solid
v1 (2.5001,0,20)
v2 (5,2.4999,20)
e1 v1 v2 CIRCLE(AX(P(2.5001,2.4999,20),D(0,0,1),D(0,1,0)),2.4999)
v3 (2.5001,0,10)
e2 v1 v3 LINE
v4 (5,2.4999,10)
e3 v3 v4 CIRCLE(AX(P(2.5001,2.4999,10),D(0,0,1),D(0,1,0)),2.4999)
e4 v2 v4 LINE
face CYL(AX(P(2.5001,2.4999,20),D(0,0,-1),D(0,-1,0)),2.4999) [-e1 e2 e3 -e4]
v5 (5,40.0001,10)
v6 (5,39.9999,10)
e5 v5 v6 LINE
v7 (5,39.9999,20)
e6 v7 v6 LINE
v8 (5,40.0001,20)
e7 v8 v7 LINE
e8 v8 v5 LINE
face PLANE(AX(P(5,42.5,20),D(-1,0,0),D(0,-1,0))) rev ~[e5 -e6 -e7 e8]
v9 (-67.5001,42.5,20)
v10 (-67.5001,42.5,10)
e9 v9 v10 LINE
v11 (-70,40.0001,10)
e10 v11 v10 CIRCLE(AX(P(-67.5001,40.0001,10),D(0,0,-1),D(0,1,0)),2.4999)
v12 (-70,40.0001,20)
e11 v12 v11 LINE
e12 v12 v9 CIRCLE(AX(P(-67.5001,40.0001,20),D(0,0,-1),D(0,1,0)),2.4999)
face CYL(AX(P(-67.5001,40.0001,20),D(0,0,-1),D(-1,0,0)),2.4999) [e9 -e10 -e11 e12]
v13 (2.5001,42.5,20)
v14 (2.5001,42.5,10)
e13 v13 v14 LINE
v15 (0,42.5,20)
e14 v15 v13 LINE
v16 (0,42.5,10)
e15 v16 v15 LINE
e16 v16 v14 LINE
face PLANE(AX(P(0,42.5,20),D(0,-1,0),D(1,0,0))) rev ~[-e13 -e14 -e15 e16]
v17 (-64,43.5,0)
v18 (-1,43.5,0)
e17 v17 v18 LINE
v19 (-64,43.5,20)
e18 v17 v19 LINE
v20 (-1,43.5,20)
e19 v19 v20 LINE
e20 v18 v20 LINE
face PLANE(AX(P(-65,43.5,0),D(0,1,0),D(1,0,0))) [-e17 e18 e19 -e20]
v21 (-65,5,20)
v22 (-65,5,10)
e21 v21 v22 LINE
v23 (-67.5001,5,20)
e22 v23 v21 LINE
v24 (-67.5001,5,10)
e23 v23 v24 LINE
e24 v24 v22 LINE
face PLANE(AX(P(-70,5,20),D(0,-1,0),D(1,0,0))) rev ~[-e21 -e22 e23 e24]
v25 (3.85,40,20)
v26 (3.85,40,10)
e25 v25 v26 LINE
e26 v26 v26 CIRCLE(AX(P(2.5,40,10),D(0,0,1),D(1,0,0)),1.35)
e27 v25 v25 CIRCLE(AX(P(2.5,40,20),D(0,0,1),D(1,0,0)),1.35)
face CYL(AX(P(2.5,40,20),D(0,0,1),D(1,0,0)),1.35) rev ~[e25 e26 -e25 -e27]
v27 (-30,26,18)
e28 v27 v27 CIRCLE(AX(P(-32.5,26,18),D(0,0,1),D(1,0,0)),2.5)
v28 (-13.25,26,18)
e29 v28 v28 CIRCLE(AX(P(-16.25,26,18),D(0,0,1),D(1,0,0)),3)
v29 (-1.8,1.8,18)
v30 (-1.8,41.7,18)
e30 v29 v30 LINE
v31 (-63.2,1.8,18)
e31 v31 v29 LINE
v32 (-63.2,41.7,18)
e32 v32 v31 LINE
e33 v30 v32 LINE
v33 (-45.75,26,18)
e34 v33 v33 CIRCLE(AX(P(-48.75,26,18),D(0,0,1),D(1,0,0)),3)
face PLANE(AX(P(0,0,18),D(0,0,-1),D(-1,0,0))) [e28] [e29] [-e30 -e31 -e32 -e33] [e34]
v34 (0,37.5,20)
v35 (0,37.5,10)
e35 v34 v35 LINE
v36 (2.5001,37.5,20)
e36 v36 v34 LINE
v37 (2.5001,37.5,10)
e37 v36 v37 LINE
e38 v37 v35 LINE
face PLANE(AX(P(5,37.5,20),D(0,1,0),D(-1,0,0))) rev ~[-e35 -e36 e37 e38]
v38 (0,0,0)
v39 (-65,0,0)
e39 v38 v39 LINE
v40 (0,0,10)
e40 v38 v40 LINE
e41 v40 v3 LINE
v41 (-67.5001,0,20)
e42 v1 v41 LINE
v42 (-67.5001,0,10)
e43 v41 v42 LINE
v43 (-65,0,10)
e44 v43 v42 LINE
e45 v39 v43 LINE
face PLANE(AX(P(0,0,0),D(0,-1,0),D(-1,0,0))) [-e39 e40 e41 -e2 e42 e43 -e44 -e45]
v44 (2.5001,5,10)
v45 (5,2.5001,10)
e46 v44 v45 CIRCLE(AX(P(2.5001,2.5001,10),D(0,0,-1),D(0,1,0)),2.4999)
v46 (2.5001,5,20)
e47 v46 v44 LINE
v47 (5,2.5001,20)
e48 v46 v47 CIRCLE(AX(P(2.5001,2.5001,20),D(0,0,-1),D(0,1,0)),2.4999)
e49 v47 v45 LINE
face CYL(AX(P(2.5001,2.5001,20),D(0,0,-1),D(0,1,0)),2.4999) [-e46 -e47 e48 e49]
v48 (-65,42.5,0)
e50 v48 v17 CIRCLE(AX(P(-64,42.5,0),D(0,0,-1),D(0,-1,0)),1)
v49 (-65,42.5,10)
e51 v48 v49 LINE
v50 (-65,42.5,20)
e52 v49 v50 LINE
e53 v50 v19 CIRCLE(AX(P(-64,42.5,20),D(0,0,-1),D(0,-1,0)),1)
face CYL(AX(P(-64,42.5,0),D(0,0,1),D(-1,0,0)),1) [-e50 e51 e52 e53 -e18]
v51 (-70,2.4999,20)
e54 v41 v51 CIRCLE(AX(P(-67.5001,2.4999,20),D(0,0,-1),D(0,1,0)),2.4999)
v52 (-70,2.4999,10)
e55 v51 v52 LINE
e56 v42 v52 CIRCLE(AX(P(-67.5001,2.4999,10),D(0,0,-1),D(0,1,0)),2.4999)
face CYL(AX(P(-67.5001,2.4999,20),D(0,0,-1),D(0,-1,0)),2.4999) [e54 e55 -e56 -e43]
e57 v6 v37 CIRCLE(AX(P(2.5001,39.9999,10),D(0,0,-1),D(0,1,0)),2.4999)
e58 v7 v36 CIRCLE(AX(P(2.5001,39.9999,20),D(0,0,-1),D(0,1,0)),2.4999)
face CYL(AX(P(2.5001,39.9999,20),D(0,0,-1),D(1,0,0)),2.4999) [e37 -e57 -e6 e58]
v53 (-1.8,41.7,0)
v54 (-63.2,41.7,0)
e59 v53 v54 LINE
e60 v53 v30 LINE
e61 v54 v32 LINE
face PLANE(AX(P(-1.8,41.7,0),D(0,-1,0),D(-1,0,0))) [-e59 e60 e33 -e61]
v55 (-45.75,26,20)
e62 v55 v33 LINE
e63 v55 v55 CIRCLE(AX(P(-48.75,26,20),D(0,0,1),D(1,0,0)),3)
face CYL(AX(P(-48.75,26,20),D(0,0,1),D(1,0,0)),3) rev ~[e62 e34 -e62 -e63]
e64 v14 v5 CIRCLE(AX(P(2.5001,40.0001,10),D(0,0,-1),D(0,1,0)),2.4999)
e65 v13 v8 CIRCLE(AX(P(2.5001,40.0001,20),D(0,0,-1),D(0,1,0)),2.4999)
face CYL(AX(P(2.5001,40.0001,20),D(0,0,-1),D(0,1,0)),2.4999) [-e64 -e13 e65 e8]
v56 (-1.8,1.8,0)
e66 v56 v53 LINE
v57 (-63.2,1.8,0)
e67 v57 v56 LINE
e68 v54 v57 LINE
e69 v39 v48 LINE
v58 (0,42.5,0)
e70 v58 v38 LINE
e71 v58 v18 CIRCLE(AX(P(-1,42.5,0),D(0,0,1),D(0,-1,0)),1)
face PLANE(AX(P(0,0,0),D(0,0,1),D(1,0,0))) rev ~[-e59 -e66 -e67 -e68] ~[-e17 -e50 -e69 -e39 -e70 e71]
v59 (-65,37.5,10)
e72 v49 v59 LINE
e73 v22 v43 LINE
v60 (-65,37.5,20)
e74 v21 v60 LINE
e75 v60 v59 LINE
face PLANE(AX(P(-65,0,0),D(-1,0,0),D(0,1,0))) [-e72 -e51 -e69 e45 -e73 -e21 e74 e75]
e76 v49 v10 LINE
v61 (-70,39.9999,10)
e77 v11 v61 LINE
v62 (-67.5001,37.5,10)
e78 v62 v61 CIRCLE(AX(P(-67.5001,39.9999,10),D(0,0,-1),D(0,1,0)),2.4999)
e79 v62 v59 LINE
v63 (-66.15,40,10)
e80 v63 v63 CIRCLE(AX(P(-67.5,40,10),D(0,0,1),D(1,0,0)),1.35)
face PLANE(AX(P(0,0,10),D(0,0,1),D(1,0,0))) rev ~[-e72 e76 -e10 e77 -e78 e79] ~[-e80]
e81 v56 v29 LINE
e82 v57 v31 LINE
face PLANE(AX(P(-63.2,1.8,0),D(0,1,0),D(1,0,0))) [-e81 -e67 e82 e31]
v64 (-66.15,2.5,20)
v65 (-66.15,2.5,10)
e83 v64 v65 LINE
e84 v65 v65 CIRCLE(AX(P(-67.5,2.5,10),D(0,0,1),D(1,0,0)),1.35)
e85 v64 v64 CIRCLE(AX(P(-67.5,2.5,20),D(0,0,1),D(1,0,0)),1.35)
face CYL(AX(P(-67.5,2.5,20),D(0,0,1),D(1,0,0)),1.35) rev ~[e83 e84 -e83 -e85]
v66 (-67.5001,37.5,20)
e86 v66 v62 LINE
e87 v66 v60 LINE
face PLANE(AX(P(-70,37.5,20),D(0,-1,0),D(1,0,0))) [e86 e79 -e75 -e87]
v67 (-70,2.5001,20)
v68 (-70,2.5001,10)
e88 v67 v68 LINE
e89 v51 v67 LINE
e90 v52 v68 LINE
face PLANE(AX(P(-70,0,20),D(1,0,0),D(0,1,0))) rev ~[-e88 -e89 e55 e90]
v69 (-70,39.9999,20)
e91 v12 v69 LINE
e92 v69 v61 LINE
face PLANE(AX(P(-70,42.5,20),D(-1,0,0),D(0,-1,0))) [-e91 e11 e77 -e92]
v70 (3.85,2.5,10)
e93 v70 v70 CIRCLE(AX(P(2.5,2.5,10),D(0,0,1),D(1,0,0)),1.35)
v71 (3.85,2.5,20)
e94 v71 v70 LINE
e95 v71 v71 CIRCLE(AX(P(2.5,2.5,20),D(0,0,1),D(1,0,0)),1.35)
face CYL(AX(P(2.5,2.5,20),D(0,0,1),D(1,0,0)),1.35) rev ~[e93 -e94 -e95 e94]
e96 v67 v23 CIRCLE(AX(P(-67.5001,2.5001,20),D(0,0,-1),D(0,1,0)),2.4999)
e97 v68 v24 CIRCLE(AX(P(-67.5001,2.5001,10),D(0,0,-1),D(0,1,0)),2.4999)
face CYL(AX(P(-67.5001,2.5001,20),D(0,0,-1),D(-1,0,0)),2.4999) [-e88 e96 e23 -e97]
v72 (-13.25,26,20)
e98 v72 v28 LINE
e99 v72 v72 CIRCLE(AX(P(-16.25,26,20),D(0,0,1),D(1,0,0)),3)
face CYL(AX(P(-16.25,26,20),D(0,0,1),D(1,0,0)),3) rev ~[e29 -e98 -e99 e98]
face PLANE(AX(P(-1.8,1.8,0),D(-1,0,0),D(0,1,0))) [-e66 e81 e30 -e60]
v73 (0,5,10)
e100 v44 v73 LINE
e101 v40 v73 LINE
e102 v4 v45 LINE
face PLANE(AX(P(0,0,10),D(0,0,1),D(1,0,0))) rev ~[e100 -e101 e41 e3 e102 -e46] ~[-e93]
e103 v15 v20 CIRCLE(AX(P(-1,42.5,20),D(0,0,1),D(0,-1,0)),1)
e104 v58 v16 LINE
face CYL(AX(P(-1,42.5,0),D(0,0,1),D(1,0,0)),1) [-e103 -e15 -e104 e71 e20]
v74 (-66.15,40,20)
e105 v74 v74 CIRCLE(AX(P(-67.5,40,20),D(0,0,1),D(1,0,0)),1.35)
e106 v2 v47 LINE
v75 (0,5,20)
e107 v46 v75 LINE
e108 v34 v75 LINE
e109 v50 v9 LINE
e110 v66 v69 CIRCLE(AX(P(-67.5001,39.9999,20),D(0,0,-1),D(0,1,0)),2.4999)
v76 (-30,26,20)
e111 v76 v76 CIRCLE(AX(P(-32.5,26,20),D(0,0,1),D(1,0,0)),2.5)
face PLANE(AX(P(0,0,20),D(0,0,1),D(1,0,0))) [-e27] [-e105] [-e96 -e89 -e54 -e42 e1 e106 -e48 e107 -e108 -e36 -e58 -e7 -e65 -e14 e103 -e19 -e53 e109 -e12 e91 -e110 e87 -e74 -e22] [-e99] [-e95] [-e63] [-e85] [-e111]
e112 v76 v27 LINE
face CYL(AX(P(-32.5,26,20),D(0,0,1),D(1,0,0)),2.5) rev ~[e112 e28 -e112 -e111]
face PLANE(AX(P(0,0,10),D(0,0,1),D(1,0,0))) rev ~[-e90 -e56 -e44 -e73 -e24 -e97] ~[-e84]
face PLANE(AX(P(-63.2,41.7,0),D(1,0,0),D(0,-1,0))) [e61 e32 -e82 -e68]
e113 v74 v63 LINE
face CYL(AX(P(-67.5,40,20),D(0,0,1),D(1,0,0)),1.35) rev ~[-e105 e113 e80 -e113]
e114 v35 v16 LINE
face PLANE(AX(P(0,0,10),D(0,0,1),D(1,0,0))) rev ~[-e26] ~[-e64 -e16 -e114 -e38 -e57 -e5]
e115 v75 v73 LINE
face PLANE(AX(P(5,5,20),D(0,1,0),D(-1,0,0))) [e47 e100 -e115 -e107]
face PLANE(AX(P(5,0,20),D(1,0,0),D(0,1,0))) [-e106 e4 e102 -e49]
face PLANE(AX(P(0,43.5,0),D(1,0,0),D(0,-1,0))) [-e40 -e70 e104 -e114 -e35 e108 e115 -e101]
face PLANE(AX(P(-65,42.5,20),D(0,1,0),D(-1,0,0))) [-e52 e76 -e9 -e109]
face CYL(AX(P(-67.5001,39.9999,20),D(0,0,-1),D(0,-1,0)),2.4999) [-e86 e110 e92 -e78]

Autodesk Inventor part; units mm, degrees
ref_plane "YZ Plane" through (0, 0, 0) normal (1, 0, 0) x (0, 1, 0)
ref_plane "XZ Plane" through (0, 0, 0) normal (0, 1, 0) x (-1, 0, 0)
ref_plane "XY Plane" through (0, 0, 0) normal (0, 0, 1) x (1, 0, 0)
sketch "Sketch1" plane through (0, 0, 0) normal (0, 0, 1) x (1, 0, 0)
  line L0 (0, 0) -> (-65, 0)
  line L1 (-65, 0) -> (-65, 43.5)
  line L2 (-65, 43.5) -> (0, 43.5)
  line L3 (0, 43.5) -> (0, 0)
  dimension "d0" = 43.5
  dimension "d1" = 65
extrude "Extrusion1" add sketch "Sketch1" along normal blind 20
sketch "Sketch2" plane through (0, 0, 0) normal (0, 0, -1) x (-1, 0, 0)
  line L0 (1.8, 41.7) -> (63.2, 41.7)
  line L1 (63.2, 41.7) -> (63.2, 1.8)
  line L2 (63.2, 1.8) -> (1.8, 1.8)
  line L3 (1.8, 1.8) -> (1.8, 41.7)
  line L4 (65, 43.5) -> (65, 0) projected
  line L5 (0, 43.5) -> (65, 43.5) projected
  line L6 (0, 0) -> (0, 43.5) projected
  line L7 (65, 0) -> (0, 0) projected
  point P0 (65, 21.75)
  dimension "d4" = 1.8
  dimension "d5" = 1.8
  dimension "d6" = 1.8
  dimension "d7" = 1.8
extrude "Extrusion2" cut sketch "Sketch2" against normal blind 18 contours L0 L1 L2 L3
sketch "Sketch3" plane through (0, 0, 20) normal (0, 0, 1) x (1, 0, 0)
  circle A0 centre (-48.75, 26) radius 3
  circle A1 centre (-32.5, 26) radius 2.5
  circle A2 centre (-16.25, 26) radius 3
  line L0 (-65, 43.5) -> (-65, 0) projected
  line L1 (0, 43.5) -> (-65, 43.5) projected
  point P0 (0, 0)
  dimension "d10" = 16.25
  dimension "d11" = 16.25
  dimension "d12" = 16.25
  dimension "d13" = 6
  dimension "d14" = 17.5
  dimension "d15" = 5
extrude "Extrusion3" cut sketch "Sketch3" against normal up to surface (2 mm away)
fillet "Fillet1" radius 1 2 edges at (-65, 43.5, 10) (0, 43.5, 10)
sketch "Sketch4" plane through (0, 0, 20) normal (0, 0, 1) x (1, 0, 0)
  line L0 (0, 0) -> (0, 42.5) projected
  line L1 (0, 42.5) -> (5, 42.5)
  line L2 (5, 42.5) -> (5, 37.5)
  line L3 (5, 37.5) -> (0, 37.5)
  line L4 (0, 37.5) -> (0, 42.5)
  line L5 (-65, 42.5) -> (-65, 0) projected
  line L6 (-65, 42.5) -> (-70, 42.5)
  line L7 (-70, 42.5) -> (-70, 37.5)
  line L8 (-70, 37.5) -> (-65, 37.5)
  line L9 (-65, 37.5) -> (-65, 42.5)
  circle A0 centre (-67.5, 40) radius 1.35
  circle A1 centre (2.5, 40) radius 1.35
  line L10 (0, 0) -> (5, 0)
  line L11 (5, 0) -> (5, 5)
  line L12 (5, 5) -> (0, 5)
  line L13 (0, 5) -> (0, 0)
  line L14 (-65, 0) -> (0, 0) projected
  line L15 (-65, 0) -> (-70, 0)
  line L16 (-70, 0) -> (-70, 5)
  line L17 (-70, 5) -> (-65, 5)
  line L18 (-65, 5) -> (-65, 0)
  circle A2 centre (-67.5, 2.5) radius 1.35
  circle A3 centre (2.5, 2.5) radius 1.35
  dimension "d19" = 5
  dimension "d20" = 5
  dimension "d21" = 5
  dimension "d22" = 5
  dimension "d23" = 2.7
  dimension "d24" = 2.7
  dimension "d25" = 5
  dimension "d26" = 5
  dimension "d27" = 5
  dimension "d28" = 5
  dimension "d29" = 2.5
  dimension "d30" = 2.5
  dimension "d31" = 2.5
  dimension "d32" = 2.5
  dimension "d33" = 2.5
  dimension "d34" = 2.5
  dimension "d35" = 2.7
  dimension "d36" = 2.7
  dimension "d37" = 2.5
  dimension "d38" = 2.5
extrude "Extrusion4" add sketch "Sketch4" against normal blind 10
full round fillet "Full Round Fillet1" first side at (3.3333, 5, 16.6667) centre faces at (5, 1.6667, 16.6667) second side at (-43.3333, 0, 16.6667)
full round fillet "Full Round Fillet2" first side at (-44.1666, 0, 16.6667) centre faces at (-70, 3.3333, 16.6667) second side at (-66.6667, 5, 16.6667)
full round fillet "Full Round Fillet3" first side at (-66.6667, 42.5, 16.6667) centre faces at (-70, 40.8333, 16.6667) second side at (-68.3333, 37.5, 16.6667)
full round fillet "Full Round Fillet4" first side at (1.6667, 37.5, 16.6667) centre faces at (5, 39.1667, 16.6667) second side at (3.3333, 42.5, 16.6667)
properties part number "BUTTON COVER"
